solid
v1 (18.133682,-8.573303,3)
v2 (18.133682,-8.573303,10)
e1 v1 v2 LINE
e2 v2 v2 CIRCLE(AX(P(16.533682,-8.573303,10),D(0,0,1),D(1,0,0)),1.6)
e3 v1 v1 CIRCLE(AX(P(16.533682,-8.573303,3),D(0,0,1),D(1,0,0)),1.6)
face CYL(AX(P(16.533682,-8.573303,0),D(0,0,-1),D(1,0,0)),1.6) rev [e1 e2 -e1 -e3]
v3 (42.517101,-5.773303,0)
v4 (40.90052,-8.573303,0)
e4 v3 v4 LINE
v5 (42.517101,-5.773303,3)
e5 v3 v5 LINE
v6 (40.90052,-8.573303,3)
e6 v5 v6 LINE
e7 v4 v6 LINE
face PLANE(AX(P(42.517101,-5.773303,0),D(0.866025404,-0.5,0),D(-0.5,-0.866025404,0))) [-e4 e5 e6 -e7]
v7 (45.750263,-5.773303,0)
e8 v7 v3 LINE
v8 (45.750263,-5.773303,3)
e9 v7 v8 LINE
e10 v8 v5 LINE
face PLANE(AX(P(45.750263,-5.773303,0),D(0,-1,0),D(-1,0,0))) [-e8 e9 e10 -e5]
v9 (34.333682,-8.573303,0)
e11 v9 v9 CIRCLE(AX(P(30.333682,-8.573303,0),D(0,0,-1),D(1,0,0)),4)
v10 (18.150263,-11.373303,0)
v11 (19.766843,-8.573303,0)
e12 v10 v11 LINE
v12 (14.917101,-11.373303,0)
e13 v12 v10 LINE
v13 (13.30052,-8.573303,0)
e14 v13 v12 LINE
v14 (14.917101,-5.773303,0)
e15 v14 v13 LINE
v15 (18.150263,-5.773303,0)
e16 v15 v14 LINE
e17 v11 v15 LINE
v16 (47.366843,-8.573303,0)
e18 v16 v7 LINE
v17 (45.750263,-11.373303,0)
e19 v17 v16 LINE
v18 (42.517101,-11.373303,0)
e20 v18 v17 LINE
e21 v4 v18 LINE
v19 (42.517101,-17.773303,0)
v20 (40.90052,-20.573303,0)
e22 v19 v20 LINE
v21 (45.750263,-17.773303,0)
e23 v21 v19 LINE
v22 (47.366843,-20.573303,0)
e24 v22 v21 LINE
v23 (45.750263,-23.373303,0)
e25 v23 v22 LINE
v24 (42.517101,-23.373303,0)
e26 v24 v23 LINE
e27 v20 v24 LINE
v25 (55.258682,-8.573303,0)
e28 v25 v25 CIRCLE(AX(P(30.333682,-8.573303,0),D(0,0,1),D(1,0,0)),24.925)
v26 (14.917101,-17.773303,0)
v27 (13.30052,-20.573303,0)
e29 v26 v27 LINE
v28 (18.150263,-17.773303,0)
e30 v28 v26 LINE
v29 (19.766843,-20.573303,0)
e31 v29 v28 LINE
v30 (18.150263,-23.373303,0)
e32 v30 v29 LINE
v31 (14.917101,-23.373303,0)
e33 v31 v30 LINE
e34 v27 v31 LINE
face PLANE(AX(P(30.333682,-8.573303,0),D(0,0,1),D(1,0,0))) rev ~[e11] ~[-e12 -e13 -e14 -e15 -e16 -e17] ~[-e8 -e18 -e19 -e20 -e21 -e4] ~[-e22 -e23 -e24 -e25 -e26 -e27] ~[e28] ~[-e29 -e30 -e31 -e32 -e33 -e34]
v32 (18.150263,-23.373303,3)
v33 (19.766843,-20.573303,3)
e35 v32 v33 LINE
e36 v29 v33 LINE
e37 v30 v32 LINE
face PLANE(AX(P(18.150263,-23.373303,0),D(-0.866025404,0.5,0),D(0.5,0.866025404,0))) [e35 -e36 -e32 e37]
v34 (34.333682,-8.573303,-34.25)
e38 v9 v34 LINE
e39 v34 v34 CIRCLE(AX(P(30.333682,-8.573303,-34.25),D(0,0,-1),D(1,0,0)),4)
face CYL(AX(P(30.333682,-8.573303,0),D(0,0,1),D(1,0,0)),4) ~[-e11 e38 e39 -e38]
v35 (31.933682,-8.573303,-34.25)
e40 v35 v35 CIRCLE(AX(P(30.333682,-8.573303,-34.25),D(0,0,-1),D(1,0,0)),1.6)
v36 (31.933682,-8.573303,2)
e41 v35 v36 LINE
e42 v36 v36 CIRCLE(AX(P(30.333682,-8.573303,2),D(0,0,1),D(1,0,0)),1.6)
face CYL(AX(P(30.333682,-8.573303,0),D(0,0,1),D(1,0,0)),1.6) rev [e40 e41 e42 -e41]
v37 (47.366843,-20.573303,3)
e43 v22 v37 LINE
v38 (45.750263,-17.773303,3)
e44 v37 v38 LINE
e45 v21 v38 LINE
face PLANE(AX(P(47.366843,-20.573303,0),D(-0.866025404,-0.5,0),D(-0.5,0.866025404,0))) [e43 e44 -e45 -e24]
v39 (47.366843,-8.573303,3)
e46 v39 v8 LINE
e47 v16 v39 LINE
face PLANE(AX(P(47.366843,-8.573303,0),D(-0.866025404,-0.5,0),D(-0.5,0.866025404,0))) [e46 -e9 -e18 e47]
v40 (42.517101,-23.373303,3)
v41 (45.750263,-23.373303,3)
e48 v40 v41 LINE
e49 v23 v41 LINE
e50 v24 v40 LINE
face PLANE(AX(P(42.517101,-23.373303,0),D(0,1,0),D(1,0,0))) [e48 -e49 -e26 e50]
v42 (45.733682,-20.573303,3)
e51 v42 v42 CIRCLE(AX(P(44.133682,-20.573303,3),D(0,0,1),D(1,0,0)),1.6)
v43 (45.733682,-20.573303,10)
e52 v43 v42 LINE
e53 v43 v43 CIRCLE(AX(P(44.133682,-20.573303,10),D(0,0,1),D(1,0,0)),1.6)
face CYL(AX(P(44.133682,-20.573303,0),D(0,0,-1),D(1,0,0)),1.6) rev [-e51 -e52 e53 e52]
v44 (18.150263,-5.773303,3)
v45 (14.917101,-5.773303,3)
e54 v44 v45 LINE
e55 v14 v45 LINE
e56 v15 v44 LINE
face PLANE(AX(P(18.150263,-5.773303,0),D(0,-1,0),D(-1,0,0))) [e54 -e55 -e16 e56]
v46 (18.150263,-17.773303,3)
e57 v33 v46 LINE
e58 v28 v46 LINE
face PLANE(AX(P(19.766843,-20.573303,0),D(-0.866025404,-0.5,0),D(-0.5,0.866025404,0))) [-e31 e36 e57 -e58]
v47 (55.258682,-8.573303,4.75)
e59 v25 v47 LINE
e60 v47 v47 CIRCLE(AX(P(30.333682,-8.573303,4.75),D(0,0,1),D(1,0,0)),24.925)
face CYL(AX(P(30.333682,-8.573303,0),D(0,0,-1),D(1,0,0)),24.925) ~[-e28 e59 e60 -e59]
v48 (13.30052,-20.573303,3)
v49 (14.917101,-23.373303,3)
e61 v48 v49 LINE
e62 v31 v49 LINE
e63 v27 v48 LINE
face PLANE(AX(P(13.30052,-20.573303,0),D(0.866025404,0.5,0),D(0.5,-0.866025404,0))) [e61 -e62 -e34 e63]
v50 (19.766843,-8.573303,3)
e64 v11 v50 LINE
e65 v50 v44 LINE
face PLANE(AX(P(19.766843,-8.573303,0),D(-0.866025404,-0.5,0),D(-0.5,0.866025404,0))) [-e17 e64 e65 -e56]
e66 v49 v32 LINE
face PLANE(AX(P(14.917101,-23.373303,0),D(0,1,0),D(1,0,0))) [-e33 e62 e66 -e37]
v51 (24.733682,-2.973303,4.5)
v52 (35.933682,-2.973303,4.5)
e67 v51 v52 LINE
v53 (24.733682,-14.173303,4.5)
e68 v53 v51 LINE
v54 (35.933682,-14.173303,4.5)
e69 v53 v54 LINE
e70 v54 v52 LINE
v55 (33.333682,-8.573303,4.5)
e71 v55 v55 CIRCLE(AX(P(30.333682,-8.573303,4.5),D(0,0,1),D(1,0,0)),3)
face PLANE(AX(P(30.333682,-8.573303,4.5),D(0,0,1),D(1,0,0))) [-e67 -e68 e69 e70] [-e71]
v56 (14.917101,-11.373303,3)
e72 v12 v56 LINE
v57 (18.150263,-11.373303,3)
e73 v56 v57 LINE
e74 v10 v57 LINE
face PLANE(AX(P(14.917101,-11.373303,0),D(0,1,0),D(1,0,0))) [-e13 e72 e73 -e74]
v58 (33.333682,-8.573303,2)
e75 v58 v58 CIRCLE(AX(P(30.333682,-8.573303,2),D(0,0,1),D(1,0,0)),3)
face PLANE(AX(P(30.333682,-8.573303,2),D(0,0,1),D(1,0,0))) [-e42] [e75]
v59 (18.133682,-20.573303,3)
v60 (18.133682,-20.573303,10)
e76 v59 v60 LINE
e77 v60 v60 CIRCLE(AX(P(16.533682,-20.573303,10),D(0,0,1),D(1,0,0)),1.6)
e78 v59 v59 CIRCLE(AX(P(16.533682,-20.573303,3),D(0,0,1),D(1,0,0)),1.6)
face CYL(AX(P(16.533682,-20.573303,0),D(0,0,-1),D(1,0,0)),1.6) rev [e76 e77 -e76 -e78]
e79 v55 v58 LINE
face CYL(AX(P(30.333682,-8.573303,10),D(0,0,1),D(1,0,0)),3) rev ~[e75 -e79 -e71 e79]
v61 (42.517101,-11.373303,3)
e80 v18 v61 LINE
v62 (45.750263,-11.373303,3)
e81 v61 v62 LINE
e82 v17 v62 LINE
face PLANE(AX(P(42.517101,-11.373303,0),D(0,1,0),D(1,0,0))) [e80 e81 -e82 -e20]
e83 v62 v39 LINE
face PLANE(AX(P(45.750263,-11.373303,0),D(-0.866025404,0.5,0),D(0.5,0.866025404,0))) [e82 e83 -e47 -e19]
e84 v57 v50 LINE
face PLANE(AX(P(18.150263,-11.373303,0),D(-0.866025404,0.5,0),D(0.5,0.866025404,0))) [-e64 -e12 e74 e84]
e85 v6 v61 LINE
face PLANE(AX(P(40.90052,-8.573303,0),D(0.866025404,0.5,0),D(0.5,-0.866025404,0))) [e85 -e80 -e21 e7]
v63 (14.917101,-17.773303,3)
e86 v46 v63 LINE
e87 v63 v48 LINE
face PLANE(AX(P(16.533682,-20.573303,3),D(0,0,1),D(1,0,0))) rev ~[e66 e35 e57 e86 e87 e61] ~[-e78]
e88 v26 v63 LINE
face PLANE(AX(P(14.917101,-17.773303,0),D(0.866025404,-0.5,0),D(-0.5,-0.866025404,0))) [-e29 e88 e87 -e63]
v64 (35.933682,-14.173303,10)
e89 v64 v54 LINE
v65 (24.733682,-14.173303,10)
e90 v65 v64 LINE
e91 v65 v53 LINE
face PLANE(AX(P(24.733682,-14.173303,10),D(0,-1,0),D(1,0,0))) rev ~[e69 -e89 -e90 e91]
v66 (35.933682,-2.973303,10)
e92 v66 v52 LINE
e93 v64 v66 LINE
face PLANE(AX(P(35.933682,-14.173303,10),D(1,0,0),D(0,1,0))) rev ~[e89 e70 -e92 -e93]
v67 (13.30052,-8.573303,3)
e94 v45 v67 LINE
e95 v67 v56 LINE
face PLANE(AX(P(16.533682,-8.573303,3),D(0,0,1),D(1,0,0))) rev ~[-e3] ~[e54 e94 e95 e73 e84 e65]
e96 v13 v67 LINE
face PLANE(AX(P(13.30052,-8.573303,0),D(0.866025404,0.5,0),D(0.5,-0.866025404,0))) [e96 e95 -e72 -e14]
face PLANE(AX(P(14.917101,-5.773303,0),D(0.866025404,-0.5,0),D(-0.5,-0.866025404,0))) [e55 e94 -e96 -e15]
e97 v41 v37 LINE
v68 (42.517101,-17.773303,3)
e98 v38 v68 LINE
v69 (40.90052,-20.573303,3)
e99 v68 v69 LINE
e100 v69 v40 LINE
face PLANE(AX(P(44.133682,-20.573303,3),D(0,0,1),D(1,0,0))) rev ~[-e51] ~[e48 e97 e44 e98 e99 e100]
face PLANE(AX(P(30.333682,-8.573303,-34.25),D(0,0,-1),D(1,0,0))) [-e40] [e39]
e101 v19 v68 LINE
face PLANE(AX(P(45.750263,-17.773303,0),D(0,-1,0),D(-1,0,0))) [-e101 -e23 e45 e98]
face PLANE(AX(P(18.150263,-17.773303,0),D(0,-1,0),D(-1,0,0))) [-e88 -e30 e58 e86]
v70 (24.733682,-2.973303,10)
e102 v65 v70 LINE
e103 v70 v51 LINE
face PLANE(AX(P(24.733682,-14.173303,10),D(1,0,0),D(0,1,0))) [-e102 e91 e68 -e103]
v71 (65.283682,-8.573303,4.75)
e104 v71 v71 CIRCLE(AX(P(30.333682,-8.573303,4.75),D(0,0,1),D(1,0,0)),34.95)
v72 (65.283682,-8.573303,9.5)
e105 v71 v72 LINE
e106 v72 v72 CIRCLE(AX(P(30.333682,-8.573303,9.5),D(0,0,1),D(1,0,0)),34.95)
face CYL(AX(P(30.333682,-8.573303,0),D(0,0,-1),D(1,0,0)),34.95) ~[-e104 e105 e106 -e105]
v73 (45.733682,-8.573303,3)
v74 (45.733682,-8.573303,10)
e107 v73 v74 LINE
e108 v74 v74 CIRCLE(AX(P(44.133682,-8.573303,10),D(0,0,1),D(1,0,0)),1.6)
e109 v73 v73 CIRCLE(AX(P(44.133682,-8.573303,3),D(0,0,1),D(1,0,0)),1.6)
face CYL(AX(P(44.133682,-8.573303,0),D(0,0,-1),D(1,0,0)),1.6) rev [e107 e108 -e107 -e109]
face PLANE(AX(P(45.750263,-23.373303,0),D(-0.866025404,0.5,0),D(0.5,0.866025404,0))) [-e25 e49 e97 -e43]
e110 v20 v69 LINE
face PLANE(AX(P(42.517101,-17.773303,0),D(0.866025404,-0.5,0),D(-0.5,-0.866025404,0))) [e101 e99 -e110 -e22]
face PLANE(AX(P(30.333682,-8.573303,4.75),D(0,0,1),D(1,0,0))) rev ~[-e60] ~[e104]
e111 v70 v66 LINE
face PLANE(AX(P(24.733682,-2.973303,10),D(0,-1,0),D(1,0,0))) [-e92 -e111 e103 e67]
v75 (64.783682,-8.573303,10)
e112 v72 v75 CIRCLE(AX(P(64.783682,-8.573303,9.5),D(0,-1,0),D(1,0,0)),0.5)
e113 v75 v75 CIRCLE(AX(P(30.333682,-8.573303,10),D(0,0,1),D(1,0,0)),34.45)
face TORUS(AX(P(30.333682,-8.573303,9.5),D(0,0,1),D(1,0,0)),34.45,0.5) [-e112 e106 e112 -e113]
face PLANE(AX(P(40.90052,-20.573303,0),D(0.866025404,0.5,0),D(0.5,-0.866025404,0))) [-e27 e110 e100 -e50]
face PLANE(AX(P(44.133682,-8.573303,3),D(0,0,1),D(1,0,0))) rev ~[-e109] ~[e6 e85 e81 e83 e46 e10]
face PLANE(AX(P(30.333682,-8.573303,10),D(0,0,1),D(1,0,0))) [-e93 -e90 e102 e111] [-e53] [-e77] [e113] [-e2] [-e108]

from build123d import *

# Parameters (mm, degrees)
F0_R      = 34.95
F0_R_2    = 24.925
F0_W      = 11.2
F0_H      = 11.2
F0_R_3    = 1.6
F0_R_4    = 3
F1_DEPTH  = 10
F2_R      = 0.5
F3_DEPTH  = 4.5
F4_DEPTH  = 4.75
F5_R      = 4
F5_R_2    = 1.6
F6_DEPTH  = 34.25
F7_DEPTH  = 3
F8_W      = 11.2
F8_H      = 11.2
F8_R      = 3
F8_R_2    = 1.6
F9_DEPTH  = 5.5
F10_DEPTH = 35.94117
F11_DEPTH = 8


# Not quite as in the source:
# - a feature names something its author has since deleted; it is built from what else it names


with BuildPart() as f1:
    # F0 (on Top) → F1 (new body)
    with BuildSketch(Plane.XY):
        with Locations((30.3336817496, -8.5733028001)):
            Circle(F0_R)
        with Locations((30.3336817496, -8.5733028001)):
            Circle(F0_R_2, mode=Mode.SUBTRACT)
        with Locations((30.3336817496, -8.5733028001)):
            Circle(F0_R_2)
        Polygon((18.1502625033, -17.7733028001), (19.766843257, -20.5733028001), (18.1502625033, -23.3733028001), (14.9171009958, -23.3733028001), (13.3005202421, -20.5733028001), (14.9171009958, -17.7733028001), align=None, mode=Mode.SUBTRACT)
        Polygon((45.7502625033, -17.7733028001), (47.366843257, -20.5733028001), (45.7502625033, -23.3733028001), (42.5171009958, -23.3733028001), (40.9005202421, -20.5733028001), (42.5171009958, -17.7733028001), align=None, mode=Mode.SUBTRACT)
        Polygon((42.5171009958, -11.3733028001), (40.9005202421, -8.5733028001), (42.5171009958, -5.7733028001), (45.7502625033, -5.7733028001), (47.366843257, -8.5733028001), (45.7502625033, -11.3733028001), align=None, mode=Mode.SUBTRACT)
        Polygon((14.9171009958, -11.3733028001), (13.3005202421, -8.5733028001), (14.9171009958, -5.7733028001), (18.1502625033, -5.7733028001), (19.766843257, -8.5733028001), (18.1502625033, -11.3733028001), align=None, mode=Mode.SUBTRACT)
        with Locations((30.3336817496, -8.5733028001)):
            Rectangle(F0_W, F0_H, mode=Mode.SUBTRACT)
        Polygon((42.5171009958, -5.7733028001), (40.9005202421, -8.5733028001), (42.5171009958, -11.3733028001), (45.7502625033, -11.3733028001), (47.366843257, -8.5733028001), (45.7502625033, -5.7733028001), align=None)
        with Locations((44.1336817496, -8.5733028001)):
            Circle(F0_R_3, mode=Mode.SUBTRACT)
        Polygon((45.7502625033, -23.3733028001), (47.366843257, -20.5733028001), (45.7502625033, -17.7733028001), (42.5171009958, -17.7733028001), (40.9005202421, -20.5733028001), (42.5171009958, -23.3733028001), align=None)
        with Locations((44.1336817496, -20.5733028001)):
            Circle(F0_R_3, mode=Mode.SUBTRACT)
        Polygon((18.1502625033, -23.3733028001), (19.766843257, -20.5733028001), (18.1502625033, -17.7733028001), (14.9171009958, -17.7733028001), (13.3005202421, -20.5733028001), (14.9171009958, -23.3733028001), align=None)
        with Locations((16.5336817496, -20.5733028001)):
            Circle(F0_R_3, mode=Mode.SUBTRACT)
        Polygon((14.9171009958, -5.7733028001), (13.3005202421, -8.5733028001), (14.9171009958, -11.3733028001), (18.1502625033, -11.3733028001), (19.766843257, -8.5733028001), (18.1502625033, -5.7733028001), align=None)
        with Locations((16.5336817496, -8.5733028001)):
            Circle(F0_R_3, mode=Mode.SUBTRACT)
        with Locations((30.3336817496, -8.5733028001)):
            Rectangle(F0_W, F0_H)
        with Locations((30.3336817496, -8.5733028001)):
            Circle(F0_R_4, mode=Mode.SUBTRACT)
        with Locations((30.3336817496, -8.5733028001)):
            Circle(F0_R_4)
        with Locations((30.3336817496, -8.5733028001)):
            Circle(F0_R_3, mode=Mode.SUBTRACT)
    extrude(amount=F1_DEPTH)

    # F2
    f2_edges = [f1.edges().sort_by_distance(p)[0] for p in [
        (-4.616318, -8.573303, 10),
    ]]
    fillet(f2_edges, radius=F2_R)

    # F0 (on Top) → F3 (join)
    with BuildSketch(Plane.XY):
        with Locations((30.3336817496, -8.5733028001)):
            Rectangle(F0_W, F0_H)
        with Locations((30.3336817496, -8.5733028001)):
            Circle(F0_R_4, mode=Mode.SUBTRACT)
        Polygon((18.1502625033, -23.3733028001), (19.766843257, -20.5733028001), (18.1502625033, -17.7733028001), (14.9171009958, -17.7733028001), (13.3005202421, -20.5733028001), (14.9171009958, -23.3733028001), align=None)
        with Locations((16.5336817496, -20.5733028001)):
            Circle(F0_R_3, mode=Mode.SUBTRACT)
        Polygon((45.7502625033, -23.3733028001), (47.366843257, -20.5733028001), (45.7502625033, -17.7733028001), (42.5171009958, -17.7733028001), (40.9005202421, -20.5733028001), (42.5171009958, -23.3733028001), align=None)
        with Locations((44.1336817496, -20.5733028001)):
            Circle(F0_R_3, mode=Mode.SUBTRACT)
    extrude(amount=F3_DEPTH)

    # F0 (on Top) → F4 (cut)
    with BuildSketch(Plane.XY):
        with Locations((30.3336817496, -8.5733028001)):
            Circle(F0_R)
        with Locations((30.3336817496, -8.5733028001)):
            Circle(F0_R_2, mode=Mode.SUBTRACT)
    extrude(amount=F4_DEPTH, mode=Mode.SUBTRACT)

    # F5 (on face) + F0 (on Top) → F6 (join)
    with BuildSketch(Plane(origin=(0, 0, 0), x_dir=(1, 0, 0), z_dir=(0, 0, -1))):
        with Locations((30.3336817496, 8.5733028001)):
            Circle(F5_R)
        with Locations((30.3336817496, 8.5733028001)):
            Circle(F5_R_2, mode=Mode.SUBTRACT)
    with BuildSketch(Plane.XY):
        with Locations((30.3336817496, -8.5733028001)):
            Circle(F0_R_4)
        with Locations((30.3336817496, -8.5733028001)):
            Circle(F0_R_3, mode=Mode.SUBTRACT)
    extrude(amount=F6_DEPTH, dir=(0, 0, -1))

    # F0 (on Top) → F7 (cut)
    with BuildSketch(Plane.XY):
        Polygon((45.7502625033, -23.3733028001), (47.366843257, -20.5733028001), (45.7502625033, -17.7733028001), (42.5171009958, -17.7733028001), (40.9005202421, -20.5733028001), (42.5171009958, -23.3733028001), align=None)
        with Locations((44.1336817496, -20.5733028001)):
            Circle(F0_R_3, mode=Mode.SUBTRACT)
        Polygon((42.5171009958, -5.7733028001), (40.9005202421, -8.5733028001), (42.5171009958, -11.3733028001), (45.7502625033, -11.3733028001), (47.366843257, -8.5733028001), (45.7502625033, -5.7733028001), align=None)
        with Locations((44.1336817496, -8.5733028001)):
            Circle(F0_R_3, mode=Mode.SUBTRACT)
        Polygon((14.9171009958, -5.7733028001), (13.3005202421, -8.5733028001), (14.9171009958, -11.3733028001), (18.1502625033, -11.3733028001), (19.766843257, -8.5733028001), (18.1502625033, -5.7733028001), align=None)
        with Locations((16.5336817496, -8.5733028001)):
            Circle(F0_R_3, mode=Mode.SUBTRACT)
        Polygon((18.1502625033, -23.3733028001), (19.766843257, -20.5733028001), (18.1502625033, -17.7733028001), (14.9171009958, -17.7733028001), (13.3005202421, -20.5733028001), (14.9171009958, -23.3733028001), align=None)
        with Locations((16.5336817496, -20.5733028001)):
            Circle(F0_R_3, mode=Mode.SUBTRACT)
    extrude(amount=F7_DEPTH, mode=Mode.SUBTRACT)

    # F8 (on face) → F9 (cut)
    with BuildSketch(Plane.XY.offset(10)):
        with Locations((30.3336817496, -8.5733028001)):
            Rectangle(F8_W, F8_H)
        with Locations((30.3336817496, -8.5733028001)):
            Circle(F8_R, mode=Mode.SUBTRACT)
        with Locations((30.3336817496, -8.5733028001)):
            Circle(F8_R)
        with Locations((30.3336817496, -8.5733028001)):
            Circle(F8_R_2, mode=Mode.SUBTRACT)
    extrude(amount=-F9_DEPTH, mode=Mode.SUBTRACT)

    # F0 (on Top) → F10 (cut)
    with BuildSketch(Plane.XY):
        with Locations((30.3336817496, -8.5733028001)):
            Circle(F0_R_3)
    extrude(amount=-F10_DEPTH, mode=Mode.SUBTRACT)

    # F8 (on face) → F11 (cut)
    with BuildSketch(Plane.XY.offset(10)):
        with Locations((30.3336817496, -8.5733028001)):
            Circle(F8_R)
        with Locations((30.3336817496, -8.5733028001)):
            Circle(F8_R_2, mode=Mode.SUBTRACT)
    extrude(amount=-F11_DEPTH, mode=Mode.SUBTRACT)


solid = f1.part
